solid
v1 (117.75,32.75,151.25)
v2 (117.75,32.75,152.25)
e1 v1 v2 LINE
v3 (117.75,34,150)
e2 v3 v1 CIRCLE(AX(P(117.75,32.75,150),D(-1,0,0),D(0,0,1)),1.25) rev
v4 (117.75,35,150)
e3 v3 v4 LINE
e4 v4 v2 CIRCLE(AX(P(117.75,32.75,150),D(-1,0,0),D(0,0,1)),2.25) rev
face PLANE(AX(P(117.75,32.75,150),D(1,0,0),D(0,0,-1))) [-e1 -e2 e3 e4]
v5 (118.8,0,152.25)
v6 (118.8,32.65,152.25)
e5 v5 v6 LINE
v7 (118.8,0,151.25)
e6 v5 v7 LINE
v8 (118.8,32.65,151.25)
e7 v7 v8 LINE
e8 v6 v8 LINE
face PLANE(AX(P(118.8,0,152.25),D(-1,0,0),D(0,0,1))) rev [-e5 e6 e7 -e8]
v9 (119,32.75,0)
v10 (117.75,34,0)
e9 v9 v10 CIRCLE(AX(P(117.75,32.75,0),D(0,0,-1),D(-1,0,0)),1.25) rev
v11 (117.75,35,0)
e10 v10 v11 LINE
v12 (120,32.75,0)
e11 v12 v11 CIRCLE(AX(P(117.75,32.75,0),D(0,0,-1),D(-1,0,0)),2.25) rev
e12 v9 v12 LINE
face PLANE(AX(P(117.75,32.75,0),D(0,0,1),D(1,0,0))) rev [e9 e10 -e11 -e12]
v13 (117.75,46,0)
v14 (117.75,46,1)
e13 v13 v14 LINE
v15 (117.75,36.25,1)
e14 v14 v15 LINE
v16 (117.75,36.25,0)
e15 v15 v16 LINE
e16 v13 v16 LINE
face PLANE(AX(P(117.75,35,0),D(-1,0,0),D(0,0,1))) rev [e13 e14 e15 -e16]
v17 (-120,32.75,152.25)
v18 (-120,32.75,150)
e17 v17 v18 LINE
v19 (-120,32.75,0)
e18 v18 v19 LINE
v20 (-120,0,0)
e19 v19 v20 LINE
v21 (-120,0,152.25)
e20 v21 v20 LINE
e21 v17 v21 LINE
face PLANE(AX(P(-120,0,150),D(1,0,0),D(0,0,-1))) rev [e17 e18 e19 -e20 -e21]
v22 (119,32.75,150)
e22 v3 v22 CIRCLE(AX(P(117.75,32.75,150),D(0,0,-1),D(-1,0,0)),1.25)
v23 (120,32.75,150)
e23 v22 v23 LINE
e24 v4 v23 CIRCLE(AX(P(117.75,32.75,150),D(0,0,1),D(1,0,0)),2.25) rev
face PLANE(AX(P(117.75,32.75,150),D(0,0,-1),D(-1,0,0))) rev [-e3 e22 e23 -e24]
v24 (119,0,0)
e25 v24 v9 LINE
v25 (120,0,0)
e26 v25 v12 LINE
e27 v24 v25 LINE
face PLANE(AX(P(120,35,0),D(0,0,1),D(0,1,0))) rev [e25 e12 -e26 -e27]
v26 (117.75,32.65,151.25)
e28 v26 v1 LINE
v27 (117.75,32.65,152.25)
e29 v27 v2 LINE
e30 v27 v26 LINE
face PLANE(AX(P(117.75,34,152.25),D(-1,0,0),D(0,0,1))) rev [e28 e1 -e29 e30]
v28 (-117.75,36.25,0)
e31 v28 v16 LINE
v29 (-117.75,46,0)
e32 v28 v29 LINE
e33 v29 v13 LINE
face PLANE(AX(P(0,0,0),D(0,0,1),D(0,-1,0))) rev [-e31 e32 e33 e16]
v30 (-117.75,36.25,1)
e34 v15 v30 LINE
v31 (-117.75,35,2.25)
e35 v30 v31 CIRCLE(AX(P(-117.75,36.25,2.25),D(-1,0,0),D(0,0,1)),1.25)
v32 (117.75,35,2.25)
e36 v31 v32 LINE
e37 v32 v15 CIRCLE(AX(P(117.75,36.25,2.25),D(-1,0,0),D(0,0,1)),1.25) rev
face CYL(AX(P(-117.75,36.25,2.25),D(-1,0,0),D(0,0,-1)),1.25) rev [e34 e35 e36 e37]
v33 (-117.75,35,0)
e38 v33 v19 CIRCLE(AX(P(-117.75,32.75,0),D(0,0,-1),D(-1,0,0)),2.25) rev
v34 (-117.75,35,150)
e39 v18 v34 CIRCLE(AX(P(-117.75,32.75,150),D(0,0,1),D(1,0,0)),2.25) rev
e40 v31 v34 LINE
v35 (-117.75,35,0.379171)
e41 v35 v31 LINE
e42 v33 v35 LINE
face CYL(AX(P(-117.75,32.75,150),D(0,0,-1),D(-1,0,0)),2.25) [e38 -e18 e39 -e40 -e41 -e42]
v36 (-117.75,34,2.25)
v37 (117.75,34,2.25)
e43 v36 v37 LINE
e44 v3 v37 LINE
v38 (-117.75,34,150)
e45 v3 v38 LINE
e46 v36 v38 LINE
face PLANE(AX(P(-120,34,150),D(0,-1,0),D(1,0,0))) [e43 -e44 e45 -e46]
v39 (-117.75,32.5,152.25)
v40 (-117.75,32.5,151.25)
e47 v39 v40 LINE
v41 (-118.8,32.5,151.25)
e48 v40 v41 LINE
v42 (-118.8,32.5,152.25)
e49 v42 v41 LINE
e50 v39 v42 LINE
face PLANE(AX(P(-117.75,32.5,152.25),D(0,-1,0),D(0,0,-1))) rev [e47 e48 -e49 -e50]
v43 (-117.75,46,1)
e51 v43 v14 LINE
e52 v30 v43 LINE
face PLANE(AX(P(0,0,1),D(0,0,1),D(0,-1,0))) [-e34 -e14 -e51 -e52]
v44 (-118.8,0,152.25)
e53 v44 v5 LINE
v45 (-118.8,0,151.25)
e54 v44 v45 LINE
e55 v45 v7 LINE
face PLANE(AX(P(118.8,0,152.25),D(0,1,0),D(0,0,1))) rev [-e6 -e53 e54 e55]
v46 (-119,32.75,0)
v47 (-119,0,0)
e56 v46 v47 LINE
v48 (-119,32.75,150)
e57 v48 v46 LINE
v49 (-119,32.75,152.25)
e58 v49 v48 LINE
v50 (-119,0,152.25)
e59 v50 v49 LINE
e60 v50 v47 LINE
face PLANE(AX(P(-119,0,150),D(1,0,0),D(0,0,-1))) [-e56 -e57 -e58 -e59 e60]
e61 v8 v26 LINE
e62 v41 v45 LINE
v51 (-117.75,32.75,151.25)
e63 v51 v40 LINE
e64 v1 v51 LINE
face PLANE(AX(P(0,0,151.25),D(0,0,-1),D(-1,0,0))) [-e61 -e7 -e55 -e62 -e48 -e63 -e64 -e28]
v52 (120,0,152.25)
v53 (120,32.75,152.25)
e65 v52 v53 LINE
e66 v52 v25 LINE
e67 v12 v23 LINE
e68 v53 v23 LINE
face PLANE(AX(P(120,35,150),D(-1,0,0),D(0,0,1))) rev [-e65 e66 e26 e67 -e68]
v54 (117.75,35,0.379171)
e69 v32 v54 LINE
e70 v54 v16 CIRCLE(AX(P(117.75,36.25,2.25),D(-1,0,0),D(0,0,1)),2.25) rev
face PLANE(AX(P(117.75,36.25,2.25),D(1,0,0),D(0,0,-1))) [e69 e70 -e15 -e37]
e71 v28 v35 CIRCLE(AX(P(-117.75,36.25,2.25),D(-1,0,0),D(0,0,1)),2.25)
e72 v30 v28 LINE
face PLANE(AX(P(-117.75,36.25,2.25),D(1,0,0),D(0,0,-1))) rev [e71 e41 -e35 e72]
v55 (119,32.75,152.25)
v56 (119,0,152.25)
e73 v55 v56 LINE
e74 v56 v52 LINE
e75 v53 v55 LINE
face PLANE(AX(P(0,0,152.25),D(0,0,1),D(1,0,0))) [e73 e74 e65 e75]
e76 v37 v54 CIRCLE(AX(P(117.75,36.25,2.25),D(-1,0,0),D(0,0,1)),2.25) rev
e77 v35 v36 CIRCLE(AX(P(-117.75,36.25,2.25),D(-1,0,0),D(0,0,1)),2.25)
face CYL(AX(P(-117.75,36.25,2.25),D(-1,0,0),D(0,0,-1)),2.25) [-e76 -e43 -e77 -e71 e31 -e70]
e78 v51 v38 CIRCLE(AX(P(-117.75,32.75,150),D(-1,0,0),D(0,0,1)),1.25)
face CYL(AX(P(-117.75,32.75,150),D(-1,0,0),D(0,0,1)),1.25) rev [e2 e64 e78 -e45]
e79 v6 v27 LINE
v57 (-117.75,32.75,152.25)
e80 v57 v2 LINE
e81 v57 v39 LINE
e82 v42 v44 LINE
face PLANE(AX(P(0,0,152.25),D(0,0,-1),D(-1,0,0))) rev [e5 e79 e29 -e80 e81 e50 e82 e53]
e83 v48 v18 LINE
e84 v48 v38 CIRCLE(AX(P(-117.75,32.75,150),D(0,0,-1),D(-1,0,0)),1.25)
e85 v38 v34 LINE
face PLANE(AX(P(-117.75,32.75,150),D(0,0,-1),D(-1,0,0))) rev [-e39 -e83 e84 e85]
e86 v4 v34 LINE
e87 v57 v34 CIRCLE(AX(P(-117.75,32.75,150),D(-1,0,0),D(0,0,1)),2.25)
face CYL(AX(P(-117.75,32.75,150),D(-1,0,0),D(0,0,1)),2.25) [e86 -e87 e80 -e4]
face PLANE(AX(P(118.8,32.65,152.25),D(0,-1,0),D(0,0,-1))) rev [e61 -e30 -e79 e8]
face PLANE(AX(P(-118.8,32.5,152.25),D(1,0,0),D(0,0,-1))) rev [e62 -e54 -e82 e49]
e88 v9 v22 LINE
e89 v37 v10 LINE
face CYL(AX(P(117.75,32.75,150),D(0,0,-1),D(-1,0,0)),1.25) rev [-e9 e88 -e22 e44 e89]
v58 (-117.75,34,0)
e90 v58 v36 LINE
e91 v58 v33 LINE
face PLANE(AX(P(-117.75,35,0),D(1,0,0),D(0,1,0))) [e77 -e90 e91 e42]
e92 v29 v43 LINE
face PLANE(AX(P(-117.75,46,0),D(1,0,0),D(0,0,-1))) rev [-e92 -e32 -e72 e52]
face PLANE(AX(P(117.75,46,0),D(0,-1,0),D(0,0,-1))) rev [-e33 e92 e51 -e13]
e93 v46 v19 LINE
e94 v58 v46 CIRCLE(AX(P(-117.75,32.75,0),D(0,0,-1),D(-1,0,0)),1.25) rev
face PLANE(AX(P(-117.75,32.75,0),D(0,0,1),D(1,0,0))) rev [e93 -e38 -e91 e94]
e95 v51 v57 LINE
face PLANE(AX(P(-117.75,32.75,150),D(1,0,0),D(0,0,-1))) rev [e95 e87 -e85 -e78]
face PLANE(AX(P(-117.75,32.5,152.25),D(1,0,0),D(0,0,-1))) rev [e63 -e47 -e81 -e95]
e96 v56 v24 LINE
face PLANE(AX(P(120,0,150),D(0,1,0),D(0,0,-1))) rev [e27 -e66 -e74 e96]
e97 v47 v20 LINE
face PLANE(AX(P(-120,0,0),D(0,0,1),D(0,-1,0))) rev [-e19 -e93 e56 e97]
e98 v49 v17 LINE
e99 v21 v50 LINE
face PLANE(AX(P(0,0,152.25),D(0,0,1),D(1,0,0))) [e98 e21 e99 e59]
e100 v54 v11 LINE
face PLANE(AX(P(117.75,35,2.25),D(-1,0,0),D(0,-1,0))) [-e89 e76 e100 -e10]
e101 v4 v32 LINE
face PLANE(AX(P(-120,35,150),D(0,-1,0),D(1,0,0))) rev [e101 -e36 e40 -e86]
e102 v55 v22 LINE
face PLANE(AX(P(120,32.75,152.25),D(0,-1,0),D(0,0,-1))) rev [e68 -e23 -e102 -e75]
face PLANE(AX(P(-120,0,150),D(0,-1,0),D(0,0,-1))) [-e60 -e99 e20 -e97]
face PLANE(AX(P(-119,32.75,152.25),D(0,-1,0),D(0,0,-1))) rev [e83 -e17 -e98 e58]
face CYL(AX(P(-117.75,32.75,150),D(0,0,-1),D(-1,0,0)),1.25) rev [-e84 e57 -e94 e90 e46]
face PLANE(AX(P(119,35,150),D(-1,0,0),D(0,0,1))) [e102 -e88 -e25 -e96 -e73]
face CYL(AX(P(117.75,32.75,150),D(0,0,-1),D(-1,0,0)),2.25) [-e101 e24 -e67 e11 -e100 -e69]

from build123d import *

# Parameters (mm, degrees)
EXTRUDE1_DEPTH               = 150
SHEET_METAL_1_DEPTH          = 150
SHEET_METAL_1_2_DEPTH        = 150
EDGE_FLANGE1_STRIP_W         = 6.5
EDGE_FLANGE1_STRIP_H         = 1
EDGE_FLANGE1_STRIP_CUT_DEPTH = 235.5
EDGE_FLANGE1_DEPTH           = 235.5
SKETCH16_W                   = 1
SKETCH16_H                   = 32.75
EXTRUDE2_DEPTH               = 2.25
EDGE_FLANGE2_DEPTH           = 235.5
EDGE_FLANGE2_START           = 1
EDGE_FLANGE2_FLAT_DEPTH      = 1


# Read off the part's stored shape, not the designer's step: Преобразовать-Твердое тело1
# Sheet-metal steps are written as plain solids
with BuildPart() as part:
    # Sketch1 → Extrude1 (new body)
    with BuildSketch(Plane.XY):
        Polygon((-120, 0), (-120, 35), (120, 35), (120, 0), (119, 0), (119, 34), (-119, 34), (-119, 0), align=None)
    extrude(amount=EXTRUDE1_DEPTH)

    # Sheet Metal 1 outline → Sheet Metal 1 (cut)
    with BuildSketch(Plane.XY):
        with BuildLine():
            Line((120, 35), (117.75, 35))
            ThreePointArc((117.75, 35), (119.340990258, 34.340990258), (120, 32.75))
            Line((120, 32.75), (120, 35))
        make_face()
        with BuildLine():
            ThreePointArc((-120, 32.75), (-119.340990258, 34.340990258), (-117.75, 35))
            Line((-117.75, 35), (-120, 35))
            Line((-120, 35), (-120, 32.75))
        make_face()
    extrude(amount=SHEET_METAL_1_DEPTH, mode=Mode.SUBTRACT)

    # Sheet Metal 1 2 outline → Sheet Metal 1 2 (add)
    with BuildSketch(Plane.XY):
        with BuildLine():
            Line((119, 34), (117.75, 34))
            ThreePointArc((117.75, 34), (118.633883476, 33.633883476), (119, 32.75))
            Line((119, 32.75), (119, 34))
        make_face()
        with BuildLine():
            ThreePointArc((-119, 32.75), (-118.633883476, 33.633883476), (-117.75, 34))
            Line((-117.75, 34), (-119, 34))
            Line((-119, 34), (-119, 32.75))
        make_face()
    extrude(amount=SHEET_METAL_1_2_DEPTH)

    # Edge-Flange1 strip (across the edge) → Edge-Flange1 strip cut (cut)
    with BuildSketch(Plane(origin=(117.75, 35, 0), x_dir=(0, 0, 1), z_dir=(-1, 0, 0))):
        with Locations((-1, -0.5)):
            Rectangle(EDGE_FLANGE1_STRIP_W, EDGE_FLANGE1_STRIP_H)
    extrude(amount=EDGE_FLANGE1_STRIP_CUT_DEPTH, mode=Mode.SUBTRACT)

    # Edge-Flange1 section (across the edge) → Edge-Flange1 (add)
    with BuildSketch(Plane(origin=(117.75, 35, 0), x_dir=(0, 0, 1), z_dir=(-1, 0, 0))):
        with BuildLine():
            Line((0, 1.25), (0, 11))
            Line((0, 11), (1, 11))
            Line((1, 11), (1, 1.25))
            ThreePointArc((1, 1.25), (1.366116524, 0.366116524), (2.25, 0))
            Line((2.25, 0), (2.25, -1))
            ThreePointArc((2.25, -1), (0.659009742, -0.340990258), (0, 1.25))
        make_face()
    extrude(amount=EDGE_FLANGE1_DEPTH)

    # Sketch16 → Extrude2 (add)
    with BuildSketch(Plane.XY.offset(150)):
        with Locations((-119.5, 16.375)):
            Rectangle(SKETCH16_W, SKETCH16_H)
        with Locations((119.5, 16.375)):
            Rectangle(SKETCH16_W, SKETCH16_H)
    extrude(amount=EXTRUDE2_DEPTH)

    # Edge-Flange2 bend section (across the edge) → Edge-Flange2 (add)
    with BuildSketch(Plane(origin=(117.75, 34, 151.25), x_dir=(0, 0, -1), z_dir=(-1, 0, 0))):
        with BuildLine():
            Line((-1, 1.25), (0, 1.25))
            ThreePointArc((0, 1.25), (0.366116524, 0.366116524), (1.25, 0))
            Line((1.25, 0), (1.25, -1))
            ThreePointArc((1.25, -1), (-0.340990258, -0.340990258), (-1, 1.25))
        make_face()
    extrude(amount=EDGE_FLANGE2_DEPTH)

    # Edge-Flange2 profile (on flange) → Edge-Flange2 flat (add)
    with BuildSketch(Plane(origin=(0, 34, 151.25), x_dir=(-1, 0, 0), z_dir=(0, 0, 1)).offset(EDGE_FLANGE2_START)):
        Polygon((-117.75, 1.35), (-117.75, 1.25), (117.75, 1.25), (117.75, 1.5), (118.8, 1.5), (118.8, 34), (-118.8, 34), (-118.8, 1.35), align=None)
    extrude(amount=-EDGE_FLANGE2_FLAT_DEPTH)


solid = part.part
